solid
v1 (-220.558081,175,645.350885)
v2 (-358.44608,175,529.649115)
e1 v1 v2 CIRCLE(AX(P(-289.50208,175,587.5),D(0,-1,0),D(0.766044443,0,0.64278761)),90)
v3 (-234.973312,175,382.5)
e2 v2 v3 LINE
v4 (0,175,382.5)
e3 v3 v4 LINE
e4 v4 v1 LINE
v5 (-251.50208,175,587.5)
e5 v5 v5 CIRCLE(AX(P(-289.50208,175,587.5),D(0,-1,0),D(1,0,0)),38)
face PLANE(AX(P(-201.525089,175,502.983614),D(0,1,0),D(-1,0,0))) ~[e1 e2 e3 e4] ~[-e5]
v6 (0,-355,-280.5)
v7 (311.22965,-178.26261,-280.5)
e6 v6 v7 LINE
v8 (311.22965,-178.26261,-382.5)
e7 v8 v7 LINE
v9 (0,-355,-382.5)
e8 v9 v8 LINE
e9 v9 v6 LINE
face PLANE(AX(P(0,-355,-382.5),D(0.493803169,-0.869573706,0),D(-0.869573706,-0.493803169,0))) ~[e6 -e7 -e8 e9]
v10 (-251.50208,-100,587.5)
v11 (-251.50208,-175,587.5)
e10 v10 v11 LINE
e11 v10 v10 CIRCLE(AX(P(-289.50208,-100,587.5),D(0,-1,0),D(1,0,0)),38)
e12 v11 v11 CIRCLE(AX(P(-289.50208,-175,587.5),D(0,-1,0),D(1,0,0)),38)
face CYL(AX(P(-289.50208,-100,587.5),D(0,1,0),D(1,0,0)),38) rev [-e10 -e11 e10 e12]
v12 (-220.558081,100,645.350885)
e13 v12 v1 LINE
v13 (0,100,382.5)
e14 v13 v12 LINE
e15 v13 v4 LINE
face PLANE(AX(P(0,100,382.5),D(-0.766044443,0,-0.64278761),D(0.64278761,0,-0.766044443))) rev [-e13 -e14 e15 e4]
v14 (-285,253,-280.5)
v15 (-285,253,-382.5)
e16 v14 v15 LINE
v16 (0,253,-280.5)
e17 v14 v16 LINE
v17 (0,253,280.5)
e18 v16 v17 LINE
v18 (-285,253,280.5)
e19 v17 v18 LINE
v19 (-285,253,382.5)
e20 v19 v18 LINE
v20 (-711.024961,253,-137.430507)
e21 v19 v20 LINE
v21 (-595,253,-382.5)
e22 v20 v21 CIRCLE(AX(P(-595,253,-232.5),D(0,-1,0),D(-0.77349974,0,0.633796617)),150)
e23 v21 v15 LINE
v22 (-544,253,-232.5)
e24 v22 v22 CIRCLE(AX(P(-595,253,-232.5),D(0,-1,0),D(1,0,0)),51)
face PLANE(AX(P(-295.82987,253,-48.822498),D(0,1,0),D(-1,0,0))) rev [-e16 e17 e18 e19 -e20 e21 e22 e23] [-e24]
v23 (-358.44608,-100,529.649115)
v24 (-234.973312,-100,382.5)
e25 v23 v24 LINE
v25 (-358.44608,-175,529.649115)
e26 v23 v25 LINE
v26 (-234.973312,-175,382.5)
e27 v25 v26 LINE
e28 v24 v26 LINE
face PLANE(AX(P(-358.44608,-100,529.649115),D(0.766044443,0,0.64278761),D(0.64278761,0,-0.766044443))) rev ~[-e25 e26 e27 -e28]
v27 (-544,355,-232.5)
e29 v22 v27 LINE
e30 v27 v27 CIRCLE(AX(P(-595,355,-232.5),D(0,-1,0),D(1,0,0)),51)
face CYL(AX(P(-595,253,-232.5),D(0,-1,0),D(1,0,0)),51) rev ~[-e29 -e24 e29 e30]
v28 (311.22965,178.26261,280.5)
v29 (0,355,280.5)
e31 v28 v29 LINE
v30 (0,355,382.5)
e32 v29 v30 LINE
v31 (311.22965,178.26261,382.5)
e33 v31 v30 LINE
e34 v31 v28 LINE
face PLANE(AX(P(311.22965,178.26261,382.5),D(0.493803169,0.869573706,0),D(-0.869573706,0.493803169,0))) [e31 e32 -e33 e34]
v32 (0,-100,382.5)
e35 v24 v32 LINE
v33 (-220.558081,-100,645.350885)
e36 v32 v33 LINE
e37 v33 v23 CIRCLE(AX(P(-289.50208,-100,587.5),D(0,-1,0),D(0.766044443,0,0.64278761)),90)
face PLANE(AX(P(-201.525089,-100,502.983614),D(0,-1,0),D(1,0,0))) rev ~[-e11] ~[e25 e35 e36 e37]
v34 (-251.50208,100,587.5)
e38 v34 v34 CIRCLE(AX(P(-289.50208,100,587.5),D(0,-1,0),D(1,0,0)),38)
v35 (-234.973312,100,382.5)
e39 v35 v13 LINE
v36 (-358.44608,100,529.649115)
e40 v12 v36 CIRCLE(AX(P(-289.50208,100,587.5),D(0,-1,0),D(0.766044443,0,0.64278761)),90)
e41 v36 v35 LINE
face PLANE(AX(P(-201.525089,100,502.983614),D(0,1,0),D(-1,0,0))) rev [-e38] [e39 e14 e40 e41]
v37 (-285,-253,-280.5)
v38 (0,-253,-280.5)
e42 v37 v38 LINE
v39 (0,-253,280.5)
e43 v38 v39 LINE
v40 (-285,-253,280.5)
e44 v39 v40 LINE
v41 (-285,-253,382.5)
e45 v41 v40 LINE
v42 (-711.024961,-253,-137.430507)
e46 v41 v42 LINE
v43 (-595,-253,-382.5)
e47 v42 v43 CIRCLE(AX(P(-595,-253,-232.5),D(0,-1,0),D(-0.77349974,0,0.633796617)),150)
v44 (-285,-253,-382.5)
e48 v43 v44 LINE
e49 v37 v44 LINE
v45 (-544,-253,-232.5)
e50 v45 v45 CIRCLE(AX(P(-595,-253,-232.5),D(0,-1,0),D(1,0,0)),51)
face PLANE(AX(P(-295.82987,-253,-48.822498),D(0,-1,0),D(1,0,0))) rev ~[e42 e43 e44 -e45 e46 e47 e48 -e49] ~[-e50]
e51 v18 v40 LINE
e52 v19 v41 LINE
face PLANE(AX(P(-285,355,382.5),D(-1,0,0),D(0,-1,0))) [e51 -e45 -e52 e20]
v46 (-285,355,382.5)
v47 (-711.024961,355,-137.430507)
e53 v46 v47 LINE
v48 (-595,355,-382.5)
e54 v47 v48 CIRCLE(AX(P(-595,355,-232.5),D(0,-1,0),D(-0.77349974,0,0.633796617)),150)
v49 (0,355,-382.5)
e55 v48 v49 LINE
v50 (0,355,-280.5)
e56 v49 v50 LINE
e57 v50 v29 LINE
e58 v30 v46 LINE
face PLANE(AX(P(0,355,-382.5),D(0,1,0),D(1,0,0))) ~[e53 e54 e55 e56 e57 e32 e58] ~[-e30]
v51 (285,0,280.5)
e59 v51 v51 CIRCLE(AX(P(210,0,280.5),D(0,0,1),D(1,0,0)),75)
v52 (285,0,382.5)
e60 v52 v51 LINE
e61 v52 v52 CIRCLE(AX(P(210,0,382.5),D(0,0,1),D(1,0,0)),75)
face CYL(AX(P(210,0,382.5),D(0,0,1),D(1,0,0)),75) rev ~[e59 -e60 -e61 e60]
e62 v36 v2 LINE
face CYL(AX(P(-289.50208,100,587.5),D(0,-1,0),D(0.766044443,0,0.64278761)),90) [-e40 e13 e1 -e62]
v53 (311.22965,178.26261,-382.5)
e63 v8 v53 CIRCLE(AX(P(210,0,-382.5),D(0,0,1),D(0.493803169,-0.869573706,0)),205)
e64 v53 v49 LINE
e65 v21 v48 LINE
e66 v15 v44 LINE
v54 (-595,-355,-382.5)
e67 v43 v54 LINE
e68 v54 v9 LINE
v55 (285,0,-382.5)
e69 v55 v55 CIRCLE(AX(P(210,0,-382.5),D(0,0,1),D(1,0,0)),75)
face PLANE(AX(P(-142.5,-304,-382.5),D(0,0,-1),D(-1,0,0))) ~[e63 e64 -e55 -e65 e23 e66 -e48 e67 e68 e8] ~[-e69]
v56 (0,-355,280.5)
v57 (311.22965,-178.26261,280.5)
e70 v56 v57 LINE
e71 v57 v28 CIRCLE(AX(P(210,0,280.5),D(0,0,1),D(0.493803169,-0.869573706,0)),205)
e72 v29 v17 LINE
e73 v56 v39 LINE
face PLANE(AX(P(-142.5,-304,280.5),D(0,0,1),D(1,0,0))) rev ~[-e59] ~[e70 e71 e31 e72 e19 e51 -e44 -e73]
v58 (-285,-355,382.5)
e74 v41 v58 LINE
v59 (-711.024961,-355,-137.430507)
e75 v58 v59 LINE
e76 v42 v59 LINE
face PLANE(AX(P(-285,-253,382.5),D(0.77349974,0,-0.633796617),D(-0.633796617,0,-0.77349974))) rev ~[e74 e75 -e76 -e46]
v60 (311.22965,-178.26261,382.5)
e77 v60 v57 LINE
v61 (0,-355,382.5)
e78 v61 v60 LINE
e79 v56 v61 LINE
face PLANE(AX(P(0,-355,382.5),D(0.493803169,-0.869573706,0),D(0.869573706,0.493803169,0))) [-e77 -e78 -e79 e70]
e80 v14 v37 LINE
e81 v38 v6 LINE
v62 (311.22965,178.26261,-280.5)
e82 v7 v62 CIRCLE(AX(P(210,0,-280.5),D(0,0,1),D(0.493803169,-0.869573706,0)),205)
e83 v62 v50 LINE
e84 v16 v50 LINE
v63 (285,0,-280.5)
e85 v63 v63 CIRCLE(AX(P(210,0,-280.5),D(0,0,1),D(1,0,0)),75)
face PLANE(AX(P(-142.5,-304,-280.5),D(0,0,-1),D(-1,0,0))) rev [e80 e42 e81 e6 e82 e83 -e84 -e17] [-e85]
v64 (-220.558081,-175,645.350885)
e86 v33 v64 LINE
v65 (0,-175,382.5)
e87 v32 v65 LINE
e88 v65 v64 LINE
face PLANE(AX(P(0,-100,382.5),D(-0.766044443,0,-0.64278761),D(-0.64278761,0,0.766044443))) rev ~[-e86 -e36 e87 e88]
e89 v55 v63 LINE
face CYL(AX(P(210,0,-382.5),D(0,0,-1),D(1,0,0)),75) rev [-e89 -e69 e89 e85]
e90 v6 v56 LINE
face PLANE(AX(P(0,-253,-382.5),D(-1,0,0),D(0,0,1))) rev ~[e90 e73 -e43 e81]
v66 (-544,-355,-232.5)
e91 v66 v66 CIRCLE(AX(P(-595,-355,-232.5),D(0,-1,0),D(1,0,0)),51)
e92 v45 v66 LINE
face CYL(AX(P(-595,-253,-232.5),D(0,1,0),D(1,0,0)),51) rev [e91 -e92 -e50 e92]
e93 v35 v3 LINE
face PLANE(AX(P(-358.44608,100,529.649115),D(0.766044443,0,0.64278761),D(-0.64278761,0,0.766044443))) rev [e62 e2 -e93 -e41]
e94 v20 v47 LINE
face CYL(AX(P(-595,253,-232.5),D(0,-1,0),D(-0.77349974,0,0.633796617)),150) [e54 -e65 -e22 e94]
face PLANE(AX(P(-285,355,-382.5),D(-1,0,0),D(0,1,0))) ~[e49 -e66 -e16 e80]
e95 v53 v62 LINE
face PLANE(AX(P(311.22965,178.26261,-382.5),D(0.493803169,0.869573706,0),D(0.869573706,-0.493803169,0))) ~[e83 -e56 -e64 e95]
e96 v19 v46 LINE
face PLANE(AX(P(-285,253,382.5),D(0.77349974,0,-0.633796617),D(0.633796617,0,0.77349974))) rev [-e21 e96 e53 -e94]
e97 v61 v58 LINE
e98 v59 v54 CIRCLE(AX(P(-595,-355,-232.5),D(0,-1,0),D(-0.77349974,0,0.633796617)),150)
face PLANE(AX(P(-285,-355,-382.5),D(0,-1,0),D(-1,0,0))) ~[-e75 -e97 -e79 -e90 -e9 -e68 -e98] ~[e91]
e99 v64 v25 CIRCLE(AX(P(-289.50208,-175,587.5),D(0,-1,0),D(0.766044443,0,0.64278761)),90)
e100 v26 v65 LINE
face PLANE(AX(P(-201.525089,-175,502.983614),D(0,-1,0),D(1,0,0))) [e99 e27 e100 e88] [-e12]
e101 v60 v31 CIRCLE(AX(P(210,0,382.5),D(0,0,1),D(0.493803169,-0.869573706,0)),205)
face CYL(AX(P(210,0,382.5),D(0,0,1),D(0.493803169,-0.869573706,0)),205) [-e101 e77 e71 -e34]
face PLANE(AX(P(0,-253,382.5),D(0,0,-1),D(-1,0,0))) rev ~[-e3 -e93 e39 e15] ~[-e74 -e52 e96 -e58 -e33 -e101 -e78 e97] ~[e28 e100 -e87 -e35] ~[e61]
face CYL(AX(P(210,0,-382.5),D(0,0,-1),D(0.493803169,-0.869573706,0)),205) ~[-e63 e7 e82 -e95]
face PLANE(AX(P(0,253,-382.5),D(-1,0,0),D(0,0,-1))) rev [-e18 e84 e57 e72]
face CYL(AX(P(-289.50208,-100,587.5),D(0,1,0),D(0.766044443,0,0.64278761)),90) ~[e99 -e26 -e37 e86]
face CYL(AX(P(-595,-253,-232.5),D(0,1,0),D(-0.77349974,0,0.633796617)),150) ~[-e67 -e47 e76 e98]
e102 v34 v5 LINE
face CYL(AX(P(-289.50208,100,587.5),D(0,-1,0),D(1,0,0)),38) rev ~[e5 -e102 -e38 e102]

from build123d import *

# Parameters (mm, degrees)
F1_R      = 51
F2_DEPTH  = 102
F4_W      = 285
F4_H      = 102
F4_R      = 75
F5_DEPTH  = 102
F9_R      = 38
F10_DEPTH = 75


# Not quite as in the source:
# - a pattern or mirror of a feature is missing from the dataset's text; its kind, count and spacing are read off the source's solid


with BuildPart() as f2:
    # F1 (on offset) → F2 (new body)
    with BuildSketch(Plane.XZ.offset(253)):
        with BuildLine():
            Line((0, -382.5), (0, 382.5))
            Line((0, 382.5), (-285, 382.5))
            Line((-285, 382.5), (-711.024961042, -137.4305074422))
            ThreePointArc((-711.024961042, -137.4305074422), (-730.5736402913, -296.6855751565), (-595, -382.5))
            Line((-595, -382.5), (0, -382.5))
        make_face()
        with Locations((-595, -232.5)):
            Circle(F1_R, mode=Mode.SUBTRACT)
    extrude(amount=F2_DEPTH)


with BuildPart() as f3_1:
    # F3: instance of F2
    add(f2.part.mirror(Plane.XZ))


with BuildPart() as f5:
    # F4 (on face) → F5 (new body)
    with BuildSketch(Plane.XY.offset(382.5)):
        with Locations((-142.5, -304)):
            Rectangle(F4_W, F4_H)
        with BuildLine():
            Line((311.2296497268, 178.2626096976), (0, 355))
            Line((0, 355), (-285, 355))
            Line((-285, 355), (-285, -253))
            Line((-285, -253), (0, -253))
            Line((0, -253), (0, -355))
            Line((0, -355), (311.2296497268, -178.2626096976))
            ThreePointArc((311.2296497268, -178.2626096976), (415, 0), (311.2296497268, 178.2626096976))
        make_face()
        with Locations((210, 0)):
            Circle(F4_R, mode=Mode.SUBTRACT)
    extrude(amount=-F5_DEPTH)


with BuildPart() as f6_1:
    # F6: instance of F5
    add(f5.part.mirror(Plane.XY))

    # F7: union F2, F3_1, F5
    add(f2.part)
    add(f3_1.part)
    add(f5.part)

    # F9 (on offset) → F10 (join)
    with BuildSketch(Plane.XZ.offset(100)):
        with BuildLine():
            Line((-234.9733120798, 382.5), (0, 382.5))
            Line((0, 382.5), (-220.5580805505, 645.3508848718))
            ThreePointArc((-220.5580805505, 645.3508848718), (-347.352965303, 656.4439998807), (-358.446080312, 529.6491151282))
            Line((-358.446080312, 529.6491151282), (-234.9733120798, 382.5))
        make_face()
        with Locations((-289.5020804312, 587.5)):
            Circle(F9_R, mode=Mode.SUBTRACT)
    f10 = extrude(amount=F10_DEPTH)

    # F10_copies: F10 across plane
    add(f10.mirror(Plane.ZX))


solid = f6_1.part
